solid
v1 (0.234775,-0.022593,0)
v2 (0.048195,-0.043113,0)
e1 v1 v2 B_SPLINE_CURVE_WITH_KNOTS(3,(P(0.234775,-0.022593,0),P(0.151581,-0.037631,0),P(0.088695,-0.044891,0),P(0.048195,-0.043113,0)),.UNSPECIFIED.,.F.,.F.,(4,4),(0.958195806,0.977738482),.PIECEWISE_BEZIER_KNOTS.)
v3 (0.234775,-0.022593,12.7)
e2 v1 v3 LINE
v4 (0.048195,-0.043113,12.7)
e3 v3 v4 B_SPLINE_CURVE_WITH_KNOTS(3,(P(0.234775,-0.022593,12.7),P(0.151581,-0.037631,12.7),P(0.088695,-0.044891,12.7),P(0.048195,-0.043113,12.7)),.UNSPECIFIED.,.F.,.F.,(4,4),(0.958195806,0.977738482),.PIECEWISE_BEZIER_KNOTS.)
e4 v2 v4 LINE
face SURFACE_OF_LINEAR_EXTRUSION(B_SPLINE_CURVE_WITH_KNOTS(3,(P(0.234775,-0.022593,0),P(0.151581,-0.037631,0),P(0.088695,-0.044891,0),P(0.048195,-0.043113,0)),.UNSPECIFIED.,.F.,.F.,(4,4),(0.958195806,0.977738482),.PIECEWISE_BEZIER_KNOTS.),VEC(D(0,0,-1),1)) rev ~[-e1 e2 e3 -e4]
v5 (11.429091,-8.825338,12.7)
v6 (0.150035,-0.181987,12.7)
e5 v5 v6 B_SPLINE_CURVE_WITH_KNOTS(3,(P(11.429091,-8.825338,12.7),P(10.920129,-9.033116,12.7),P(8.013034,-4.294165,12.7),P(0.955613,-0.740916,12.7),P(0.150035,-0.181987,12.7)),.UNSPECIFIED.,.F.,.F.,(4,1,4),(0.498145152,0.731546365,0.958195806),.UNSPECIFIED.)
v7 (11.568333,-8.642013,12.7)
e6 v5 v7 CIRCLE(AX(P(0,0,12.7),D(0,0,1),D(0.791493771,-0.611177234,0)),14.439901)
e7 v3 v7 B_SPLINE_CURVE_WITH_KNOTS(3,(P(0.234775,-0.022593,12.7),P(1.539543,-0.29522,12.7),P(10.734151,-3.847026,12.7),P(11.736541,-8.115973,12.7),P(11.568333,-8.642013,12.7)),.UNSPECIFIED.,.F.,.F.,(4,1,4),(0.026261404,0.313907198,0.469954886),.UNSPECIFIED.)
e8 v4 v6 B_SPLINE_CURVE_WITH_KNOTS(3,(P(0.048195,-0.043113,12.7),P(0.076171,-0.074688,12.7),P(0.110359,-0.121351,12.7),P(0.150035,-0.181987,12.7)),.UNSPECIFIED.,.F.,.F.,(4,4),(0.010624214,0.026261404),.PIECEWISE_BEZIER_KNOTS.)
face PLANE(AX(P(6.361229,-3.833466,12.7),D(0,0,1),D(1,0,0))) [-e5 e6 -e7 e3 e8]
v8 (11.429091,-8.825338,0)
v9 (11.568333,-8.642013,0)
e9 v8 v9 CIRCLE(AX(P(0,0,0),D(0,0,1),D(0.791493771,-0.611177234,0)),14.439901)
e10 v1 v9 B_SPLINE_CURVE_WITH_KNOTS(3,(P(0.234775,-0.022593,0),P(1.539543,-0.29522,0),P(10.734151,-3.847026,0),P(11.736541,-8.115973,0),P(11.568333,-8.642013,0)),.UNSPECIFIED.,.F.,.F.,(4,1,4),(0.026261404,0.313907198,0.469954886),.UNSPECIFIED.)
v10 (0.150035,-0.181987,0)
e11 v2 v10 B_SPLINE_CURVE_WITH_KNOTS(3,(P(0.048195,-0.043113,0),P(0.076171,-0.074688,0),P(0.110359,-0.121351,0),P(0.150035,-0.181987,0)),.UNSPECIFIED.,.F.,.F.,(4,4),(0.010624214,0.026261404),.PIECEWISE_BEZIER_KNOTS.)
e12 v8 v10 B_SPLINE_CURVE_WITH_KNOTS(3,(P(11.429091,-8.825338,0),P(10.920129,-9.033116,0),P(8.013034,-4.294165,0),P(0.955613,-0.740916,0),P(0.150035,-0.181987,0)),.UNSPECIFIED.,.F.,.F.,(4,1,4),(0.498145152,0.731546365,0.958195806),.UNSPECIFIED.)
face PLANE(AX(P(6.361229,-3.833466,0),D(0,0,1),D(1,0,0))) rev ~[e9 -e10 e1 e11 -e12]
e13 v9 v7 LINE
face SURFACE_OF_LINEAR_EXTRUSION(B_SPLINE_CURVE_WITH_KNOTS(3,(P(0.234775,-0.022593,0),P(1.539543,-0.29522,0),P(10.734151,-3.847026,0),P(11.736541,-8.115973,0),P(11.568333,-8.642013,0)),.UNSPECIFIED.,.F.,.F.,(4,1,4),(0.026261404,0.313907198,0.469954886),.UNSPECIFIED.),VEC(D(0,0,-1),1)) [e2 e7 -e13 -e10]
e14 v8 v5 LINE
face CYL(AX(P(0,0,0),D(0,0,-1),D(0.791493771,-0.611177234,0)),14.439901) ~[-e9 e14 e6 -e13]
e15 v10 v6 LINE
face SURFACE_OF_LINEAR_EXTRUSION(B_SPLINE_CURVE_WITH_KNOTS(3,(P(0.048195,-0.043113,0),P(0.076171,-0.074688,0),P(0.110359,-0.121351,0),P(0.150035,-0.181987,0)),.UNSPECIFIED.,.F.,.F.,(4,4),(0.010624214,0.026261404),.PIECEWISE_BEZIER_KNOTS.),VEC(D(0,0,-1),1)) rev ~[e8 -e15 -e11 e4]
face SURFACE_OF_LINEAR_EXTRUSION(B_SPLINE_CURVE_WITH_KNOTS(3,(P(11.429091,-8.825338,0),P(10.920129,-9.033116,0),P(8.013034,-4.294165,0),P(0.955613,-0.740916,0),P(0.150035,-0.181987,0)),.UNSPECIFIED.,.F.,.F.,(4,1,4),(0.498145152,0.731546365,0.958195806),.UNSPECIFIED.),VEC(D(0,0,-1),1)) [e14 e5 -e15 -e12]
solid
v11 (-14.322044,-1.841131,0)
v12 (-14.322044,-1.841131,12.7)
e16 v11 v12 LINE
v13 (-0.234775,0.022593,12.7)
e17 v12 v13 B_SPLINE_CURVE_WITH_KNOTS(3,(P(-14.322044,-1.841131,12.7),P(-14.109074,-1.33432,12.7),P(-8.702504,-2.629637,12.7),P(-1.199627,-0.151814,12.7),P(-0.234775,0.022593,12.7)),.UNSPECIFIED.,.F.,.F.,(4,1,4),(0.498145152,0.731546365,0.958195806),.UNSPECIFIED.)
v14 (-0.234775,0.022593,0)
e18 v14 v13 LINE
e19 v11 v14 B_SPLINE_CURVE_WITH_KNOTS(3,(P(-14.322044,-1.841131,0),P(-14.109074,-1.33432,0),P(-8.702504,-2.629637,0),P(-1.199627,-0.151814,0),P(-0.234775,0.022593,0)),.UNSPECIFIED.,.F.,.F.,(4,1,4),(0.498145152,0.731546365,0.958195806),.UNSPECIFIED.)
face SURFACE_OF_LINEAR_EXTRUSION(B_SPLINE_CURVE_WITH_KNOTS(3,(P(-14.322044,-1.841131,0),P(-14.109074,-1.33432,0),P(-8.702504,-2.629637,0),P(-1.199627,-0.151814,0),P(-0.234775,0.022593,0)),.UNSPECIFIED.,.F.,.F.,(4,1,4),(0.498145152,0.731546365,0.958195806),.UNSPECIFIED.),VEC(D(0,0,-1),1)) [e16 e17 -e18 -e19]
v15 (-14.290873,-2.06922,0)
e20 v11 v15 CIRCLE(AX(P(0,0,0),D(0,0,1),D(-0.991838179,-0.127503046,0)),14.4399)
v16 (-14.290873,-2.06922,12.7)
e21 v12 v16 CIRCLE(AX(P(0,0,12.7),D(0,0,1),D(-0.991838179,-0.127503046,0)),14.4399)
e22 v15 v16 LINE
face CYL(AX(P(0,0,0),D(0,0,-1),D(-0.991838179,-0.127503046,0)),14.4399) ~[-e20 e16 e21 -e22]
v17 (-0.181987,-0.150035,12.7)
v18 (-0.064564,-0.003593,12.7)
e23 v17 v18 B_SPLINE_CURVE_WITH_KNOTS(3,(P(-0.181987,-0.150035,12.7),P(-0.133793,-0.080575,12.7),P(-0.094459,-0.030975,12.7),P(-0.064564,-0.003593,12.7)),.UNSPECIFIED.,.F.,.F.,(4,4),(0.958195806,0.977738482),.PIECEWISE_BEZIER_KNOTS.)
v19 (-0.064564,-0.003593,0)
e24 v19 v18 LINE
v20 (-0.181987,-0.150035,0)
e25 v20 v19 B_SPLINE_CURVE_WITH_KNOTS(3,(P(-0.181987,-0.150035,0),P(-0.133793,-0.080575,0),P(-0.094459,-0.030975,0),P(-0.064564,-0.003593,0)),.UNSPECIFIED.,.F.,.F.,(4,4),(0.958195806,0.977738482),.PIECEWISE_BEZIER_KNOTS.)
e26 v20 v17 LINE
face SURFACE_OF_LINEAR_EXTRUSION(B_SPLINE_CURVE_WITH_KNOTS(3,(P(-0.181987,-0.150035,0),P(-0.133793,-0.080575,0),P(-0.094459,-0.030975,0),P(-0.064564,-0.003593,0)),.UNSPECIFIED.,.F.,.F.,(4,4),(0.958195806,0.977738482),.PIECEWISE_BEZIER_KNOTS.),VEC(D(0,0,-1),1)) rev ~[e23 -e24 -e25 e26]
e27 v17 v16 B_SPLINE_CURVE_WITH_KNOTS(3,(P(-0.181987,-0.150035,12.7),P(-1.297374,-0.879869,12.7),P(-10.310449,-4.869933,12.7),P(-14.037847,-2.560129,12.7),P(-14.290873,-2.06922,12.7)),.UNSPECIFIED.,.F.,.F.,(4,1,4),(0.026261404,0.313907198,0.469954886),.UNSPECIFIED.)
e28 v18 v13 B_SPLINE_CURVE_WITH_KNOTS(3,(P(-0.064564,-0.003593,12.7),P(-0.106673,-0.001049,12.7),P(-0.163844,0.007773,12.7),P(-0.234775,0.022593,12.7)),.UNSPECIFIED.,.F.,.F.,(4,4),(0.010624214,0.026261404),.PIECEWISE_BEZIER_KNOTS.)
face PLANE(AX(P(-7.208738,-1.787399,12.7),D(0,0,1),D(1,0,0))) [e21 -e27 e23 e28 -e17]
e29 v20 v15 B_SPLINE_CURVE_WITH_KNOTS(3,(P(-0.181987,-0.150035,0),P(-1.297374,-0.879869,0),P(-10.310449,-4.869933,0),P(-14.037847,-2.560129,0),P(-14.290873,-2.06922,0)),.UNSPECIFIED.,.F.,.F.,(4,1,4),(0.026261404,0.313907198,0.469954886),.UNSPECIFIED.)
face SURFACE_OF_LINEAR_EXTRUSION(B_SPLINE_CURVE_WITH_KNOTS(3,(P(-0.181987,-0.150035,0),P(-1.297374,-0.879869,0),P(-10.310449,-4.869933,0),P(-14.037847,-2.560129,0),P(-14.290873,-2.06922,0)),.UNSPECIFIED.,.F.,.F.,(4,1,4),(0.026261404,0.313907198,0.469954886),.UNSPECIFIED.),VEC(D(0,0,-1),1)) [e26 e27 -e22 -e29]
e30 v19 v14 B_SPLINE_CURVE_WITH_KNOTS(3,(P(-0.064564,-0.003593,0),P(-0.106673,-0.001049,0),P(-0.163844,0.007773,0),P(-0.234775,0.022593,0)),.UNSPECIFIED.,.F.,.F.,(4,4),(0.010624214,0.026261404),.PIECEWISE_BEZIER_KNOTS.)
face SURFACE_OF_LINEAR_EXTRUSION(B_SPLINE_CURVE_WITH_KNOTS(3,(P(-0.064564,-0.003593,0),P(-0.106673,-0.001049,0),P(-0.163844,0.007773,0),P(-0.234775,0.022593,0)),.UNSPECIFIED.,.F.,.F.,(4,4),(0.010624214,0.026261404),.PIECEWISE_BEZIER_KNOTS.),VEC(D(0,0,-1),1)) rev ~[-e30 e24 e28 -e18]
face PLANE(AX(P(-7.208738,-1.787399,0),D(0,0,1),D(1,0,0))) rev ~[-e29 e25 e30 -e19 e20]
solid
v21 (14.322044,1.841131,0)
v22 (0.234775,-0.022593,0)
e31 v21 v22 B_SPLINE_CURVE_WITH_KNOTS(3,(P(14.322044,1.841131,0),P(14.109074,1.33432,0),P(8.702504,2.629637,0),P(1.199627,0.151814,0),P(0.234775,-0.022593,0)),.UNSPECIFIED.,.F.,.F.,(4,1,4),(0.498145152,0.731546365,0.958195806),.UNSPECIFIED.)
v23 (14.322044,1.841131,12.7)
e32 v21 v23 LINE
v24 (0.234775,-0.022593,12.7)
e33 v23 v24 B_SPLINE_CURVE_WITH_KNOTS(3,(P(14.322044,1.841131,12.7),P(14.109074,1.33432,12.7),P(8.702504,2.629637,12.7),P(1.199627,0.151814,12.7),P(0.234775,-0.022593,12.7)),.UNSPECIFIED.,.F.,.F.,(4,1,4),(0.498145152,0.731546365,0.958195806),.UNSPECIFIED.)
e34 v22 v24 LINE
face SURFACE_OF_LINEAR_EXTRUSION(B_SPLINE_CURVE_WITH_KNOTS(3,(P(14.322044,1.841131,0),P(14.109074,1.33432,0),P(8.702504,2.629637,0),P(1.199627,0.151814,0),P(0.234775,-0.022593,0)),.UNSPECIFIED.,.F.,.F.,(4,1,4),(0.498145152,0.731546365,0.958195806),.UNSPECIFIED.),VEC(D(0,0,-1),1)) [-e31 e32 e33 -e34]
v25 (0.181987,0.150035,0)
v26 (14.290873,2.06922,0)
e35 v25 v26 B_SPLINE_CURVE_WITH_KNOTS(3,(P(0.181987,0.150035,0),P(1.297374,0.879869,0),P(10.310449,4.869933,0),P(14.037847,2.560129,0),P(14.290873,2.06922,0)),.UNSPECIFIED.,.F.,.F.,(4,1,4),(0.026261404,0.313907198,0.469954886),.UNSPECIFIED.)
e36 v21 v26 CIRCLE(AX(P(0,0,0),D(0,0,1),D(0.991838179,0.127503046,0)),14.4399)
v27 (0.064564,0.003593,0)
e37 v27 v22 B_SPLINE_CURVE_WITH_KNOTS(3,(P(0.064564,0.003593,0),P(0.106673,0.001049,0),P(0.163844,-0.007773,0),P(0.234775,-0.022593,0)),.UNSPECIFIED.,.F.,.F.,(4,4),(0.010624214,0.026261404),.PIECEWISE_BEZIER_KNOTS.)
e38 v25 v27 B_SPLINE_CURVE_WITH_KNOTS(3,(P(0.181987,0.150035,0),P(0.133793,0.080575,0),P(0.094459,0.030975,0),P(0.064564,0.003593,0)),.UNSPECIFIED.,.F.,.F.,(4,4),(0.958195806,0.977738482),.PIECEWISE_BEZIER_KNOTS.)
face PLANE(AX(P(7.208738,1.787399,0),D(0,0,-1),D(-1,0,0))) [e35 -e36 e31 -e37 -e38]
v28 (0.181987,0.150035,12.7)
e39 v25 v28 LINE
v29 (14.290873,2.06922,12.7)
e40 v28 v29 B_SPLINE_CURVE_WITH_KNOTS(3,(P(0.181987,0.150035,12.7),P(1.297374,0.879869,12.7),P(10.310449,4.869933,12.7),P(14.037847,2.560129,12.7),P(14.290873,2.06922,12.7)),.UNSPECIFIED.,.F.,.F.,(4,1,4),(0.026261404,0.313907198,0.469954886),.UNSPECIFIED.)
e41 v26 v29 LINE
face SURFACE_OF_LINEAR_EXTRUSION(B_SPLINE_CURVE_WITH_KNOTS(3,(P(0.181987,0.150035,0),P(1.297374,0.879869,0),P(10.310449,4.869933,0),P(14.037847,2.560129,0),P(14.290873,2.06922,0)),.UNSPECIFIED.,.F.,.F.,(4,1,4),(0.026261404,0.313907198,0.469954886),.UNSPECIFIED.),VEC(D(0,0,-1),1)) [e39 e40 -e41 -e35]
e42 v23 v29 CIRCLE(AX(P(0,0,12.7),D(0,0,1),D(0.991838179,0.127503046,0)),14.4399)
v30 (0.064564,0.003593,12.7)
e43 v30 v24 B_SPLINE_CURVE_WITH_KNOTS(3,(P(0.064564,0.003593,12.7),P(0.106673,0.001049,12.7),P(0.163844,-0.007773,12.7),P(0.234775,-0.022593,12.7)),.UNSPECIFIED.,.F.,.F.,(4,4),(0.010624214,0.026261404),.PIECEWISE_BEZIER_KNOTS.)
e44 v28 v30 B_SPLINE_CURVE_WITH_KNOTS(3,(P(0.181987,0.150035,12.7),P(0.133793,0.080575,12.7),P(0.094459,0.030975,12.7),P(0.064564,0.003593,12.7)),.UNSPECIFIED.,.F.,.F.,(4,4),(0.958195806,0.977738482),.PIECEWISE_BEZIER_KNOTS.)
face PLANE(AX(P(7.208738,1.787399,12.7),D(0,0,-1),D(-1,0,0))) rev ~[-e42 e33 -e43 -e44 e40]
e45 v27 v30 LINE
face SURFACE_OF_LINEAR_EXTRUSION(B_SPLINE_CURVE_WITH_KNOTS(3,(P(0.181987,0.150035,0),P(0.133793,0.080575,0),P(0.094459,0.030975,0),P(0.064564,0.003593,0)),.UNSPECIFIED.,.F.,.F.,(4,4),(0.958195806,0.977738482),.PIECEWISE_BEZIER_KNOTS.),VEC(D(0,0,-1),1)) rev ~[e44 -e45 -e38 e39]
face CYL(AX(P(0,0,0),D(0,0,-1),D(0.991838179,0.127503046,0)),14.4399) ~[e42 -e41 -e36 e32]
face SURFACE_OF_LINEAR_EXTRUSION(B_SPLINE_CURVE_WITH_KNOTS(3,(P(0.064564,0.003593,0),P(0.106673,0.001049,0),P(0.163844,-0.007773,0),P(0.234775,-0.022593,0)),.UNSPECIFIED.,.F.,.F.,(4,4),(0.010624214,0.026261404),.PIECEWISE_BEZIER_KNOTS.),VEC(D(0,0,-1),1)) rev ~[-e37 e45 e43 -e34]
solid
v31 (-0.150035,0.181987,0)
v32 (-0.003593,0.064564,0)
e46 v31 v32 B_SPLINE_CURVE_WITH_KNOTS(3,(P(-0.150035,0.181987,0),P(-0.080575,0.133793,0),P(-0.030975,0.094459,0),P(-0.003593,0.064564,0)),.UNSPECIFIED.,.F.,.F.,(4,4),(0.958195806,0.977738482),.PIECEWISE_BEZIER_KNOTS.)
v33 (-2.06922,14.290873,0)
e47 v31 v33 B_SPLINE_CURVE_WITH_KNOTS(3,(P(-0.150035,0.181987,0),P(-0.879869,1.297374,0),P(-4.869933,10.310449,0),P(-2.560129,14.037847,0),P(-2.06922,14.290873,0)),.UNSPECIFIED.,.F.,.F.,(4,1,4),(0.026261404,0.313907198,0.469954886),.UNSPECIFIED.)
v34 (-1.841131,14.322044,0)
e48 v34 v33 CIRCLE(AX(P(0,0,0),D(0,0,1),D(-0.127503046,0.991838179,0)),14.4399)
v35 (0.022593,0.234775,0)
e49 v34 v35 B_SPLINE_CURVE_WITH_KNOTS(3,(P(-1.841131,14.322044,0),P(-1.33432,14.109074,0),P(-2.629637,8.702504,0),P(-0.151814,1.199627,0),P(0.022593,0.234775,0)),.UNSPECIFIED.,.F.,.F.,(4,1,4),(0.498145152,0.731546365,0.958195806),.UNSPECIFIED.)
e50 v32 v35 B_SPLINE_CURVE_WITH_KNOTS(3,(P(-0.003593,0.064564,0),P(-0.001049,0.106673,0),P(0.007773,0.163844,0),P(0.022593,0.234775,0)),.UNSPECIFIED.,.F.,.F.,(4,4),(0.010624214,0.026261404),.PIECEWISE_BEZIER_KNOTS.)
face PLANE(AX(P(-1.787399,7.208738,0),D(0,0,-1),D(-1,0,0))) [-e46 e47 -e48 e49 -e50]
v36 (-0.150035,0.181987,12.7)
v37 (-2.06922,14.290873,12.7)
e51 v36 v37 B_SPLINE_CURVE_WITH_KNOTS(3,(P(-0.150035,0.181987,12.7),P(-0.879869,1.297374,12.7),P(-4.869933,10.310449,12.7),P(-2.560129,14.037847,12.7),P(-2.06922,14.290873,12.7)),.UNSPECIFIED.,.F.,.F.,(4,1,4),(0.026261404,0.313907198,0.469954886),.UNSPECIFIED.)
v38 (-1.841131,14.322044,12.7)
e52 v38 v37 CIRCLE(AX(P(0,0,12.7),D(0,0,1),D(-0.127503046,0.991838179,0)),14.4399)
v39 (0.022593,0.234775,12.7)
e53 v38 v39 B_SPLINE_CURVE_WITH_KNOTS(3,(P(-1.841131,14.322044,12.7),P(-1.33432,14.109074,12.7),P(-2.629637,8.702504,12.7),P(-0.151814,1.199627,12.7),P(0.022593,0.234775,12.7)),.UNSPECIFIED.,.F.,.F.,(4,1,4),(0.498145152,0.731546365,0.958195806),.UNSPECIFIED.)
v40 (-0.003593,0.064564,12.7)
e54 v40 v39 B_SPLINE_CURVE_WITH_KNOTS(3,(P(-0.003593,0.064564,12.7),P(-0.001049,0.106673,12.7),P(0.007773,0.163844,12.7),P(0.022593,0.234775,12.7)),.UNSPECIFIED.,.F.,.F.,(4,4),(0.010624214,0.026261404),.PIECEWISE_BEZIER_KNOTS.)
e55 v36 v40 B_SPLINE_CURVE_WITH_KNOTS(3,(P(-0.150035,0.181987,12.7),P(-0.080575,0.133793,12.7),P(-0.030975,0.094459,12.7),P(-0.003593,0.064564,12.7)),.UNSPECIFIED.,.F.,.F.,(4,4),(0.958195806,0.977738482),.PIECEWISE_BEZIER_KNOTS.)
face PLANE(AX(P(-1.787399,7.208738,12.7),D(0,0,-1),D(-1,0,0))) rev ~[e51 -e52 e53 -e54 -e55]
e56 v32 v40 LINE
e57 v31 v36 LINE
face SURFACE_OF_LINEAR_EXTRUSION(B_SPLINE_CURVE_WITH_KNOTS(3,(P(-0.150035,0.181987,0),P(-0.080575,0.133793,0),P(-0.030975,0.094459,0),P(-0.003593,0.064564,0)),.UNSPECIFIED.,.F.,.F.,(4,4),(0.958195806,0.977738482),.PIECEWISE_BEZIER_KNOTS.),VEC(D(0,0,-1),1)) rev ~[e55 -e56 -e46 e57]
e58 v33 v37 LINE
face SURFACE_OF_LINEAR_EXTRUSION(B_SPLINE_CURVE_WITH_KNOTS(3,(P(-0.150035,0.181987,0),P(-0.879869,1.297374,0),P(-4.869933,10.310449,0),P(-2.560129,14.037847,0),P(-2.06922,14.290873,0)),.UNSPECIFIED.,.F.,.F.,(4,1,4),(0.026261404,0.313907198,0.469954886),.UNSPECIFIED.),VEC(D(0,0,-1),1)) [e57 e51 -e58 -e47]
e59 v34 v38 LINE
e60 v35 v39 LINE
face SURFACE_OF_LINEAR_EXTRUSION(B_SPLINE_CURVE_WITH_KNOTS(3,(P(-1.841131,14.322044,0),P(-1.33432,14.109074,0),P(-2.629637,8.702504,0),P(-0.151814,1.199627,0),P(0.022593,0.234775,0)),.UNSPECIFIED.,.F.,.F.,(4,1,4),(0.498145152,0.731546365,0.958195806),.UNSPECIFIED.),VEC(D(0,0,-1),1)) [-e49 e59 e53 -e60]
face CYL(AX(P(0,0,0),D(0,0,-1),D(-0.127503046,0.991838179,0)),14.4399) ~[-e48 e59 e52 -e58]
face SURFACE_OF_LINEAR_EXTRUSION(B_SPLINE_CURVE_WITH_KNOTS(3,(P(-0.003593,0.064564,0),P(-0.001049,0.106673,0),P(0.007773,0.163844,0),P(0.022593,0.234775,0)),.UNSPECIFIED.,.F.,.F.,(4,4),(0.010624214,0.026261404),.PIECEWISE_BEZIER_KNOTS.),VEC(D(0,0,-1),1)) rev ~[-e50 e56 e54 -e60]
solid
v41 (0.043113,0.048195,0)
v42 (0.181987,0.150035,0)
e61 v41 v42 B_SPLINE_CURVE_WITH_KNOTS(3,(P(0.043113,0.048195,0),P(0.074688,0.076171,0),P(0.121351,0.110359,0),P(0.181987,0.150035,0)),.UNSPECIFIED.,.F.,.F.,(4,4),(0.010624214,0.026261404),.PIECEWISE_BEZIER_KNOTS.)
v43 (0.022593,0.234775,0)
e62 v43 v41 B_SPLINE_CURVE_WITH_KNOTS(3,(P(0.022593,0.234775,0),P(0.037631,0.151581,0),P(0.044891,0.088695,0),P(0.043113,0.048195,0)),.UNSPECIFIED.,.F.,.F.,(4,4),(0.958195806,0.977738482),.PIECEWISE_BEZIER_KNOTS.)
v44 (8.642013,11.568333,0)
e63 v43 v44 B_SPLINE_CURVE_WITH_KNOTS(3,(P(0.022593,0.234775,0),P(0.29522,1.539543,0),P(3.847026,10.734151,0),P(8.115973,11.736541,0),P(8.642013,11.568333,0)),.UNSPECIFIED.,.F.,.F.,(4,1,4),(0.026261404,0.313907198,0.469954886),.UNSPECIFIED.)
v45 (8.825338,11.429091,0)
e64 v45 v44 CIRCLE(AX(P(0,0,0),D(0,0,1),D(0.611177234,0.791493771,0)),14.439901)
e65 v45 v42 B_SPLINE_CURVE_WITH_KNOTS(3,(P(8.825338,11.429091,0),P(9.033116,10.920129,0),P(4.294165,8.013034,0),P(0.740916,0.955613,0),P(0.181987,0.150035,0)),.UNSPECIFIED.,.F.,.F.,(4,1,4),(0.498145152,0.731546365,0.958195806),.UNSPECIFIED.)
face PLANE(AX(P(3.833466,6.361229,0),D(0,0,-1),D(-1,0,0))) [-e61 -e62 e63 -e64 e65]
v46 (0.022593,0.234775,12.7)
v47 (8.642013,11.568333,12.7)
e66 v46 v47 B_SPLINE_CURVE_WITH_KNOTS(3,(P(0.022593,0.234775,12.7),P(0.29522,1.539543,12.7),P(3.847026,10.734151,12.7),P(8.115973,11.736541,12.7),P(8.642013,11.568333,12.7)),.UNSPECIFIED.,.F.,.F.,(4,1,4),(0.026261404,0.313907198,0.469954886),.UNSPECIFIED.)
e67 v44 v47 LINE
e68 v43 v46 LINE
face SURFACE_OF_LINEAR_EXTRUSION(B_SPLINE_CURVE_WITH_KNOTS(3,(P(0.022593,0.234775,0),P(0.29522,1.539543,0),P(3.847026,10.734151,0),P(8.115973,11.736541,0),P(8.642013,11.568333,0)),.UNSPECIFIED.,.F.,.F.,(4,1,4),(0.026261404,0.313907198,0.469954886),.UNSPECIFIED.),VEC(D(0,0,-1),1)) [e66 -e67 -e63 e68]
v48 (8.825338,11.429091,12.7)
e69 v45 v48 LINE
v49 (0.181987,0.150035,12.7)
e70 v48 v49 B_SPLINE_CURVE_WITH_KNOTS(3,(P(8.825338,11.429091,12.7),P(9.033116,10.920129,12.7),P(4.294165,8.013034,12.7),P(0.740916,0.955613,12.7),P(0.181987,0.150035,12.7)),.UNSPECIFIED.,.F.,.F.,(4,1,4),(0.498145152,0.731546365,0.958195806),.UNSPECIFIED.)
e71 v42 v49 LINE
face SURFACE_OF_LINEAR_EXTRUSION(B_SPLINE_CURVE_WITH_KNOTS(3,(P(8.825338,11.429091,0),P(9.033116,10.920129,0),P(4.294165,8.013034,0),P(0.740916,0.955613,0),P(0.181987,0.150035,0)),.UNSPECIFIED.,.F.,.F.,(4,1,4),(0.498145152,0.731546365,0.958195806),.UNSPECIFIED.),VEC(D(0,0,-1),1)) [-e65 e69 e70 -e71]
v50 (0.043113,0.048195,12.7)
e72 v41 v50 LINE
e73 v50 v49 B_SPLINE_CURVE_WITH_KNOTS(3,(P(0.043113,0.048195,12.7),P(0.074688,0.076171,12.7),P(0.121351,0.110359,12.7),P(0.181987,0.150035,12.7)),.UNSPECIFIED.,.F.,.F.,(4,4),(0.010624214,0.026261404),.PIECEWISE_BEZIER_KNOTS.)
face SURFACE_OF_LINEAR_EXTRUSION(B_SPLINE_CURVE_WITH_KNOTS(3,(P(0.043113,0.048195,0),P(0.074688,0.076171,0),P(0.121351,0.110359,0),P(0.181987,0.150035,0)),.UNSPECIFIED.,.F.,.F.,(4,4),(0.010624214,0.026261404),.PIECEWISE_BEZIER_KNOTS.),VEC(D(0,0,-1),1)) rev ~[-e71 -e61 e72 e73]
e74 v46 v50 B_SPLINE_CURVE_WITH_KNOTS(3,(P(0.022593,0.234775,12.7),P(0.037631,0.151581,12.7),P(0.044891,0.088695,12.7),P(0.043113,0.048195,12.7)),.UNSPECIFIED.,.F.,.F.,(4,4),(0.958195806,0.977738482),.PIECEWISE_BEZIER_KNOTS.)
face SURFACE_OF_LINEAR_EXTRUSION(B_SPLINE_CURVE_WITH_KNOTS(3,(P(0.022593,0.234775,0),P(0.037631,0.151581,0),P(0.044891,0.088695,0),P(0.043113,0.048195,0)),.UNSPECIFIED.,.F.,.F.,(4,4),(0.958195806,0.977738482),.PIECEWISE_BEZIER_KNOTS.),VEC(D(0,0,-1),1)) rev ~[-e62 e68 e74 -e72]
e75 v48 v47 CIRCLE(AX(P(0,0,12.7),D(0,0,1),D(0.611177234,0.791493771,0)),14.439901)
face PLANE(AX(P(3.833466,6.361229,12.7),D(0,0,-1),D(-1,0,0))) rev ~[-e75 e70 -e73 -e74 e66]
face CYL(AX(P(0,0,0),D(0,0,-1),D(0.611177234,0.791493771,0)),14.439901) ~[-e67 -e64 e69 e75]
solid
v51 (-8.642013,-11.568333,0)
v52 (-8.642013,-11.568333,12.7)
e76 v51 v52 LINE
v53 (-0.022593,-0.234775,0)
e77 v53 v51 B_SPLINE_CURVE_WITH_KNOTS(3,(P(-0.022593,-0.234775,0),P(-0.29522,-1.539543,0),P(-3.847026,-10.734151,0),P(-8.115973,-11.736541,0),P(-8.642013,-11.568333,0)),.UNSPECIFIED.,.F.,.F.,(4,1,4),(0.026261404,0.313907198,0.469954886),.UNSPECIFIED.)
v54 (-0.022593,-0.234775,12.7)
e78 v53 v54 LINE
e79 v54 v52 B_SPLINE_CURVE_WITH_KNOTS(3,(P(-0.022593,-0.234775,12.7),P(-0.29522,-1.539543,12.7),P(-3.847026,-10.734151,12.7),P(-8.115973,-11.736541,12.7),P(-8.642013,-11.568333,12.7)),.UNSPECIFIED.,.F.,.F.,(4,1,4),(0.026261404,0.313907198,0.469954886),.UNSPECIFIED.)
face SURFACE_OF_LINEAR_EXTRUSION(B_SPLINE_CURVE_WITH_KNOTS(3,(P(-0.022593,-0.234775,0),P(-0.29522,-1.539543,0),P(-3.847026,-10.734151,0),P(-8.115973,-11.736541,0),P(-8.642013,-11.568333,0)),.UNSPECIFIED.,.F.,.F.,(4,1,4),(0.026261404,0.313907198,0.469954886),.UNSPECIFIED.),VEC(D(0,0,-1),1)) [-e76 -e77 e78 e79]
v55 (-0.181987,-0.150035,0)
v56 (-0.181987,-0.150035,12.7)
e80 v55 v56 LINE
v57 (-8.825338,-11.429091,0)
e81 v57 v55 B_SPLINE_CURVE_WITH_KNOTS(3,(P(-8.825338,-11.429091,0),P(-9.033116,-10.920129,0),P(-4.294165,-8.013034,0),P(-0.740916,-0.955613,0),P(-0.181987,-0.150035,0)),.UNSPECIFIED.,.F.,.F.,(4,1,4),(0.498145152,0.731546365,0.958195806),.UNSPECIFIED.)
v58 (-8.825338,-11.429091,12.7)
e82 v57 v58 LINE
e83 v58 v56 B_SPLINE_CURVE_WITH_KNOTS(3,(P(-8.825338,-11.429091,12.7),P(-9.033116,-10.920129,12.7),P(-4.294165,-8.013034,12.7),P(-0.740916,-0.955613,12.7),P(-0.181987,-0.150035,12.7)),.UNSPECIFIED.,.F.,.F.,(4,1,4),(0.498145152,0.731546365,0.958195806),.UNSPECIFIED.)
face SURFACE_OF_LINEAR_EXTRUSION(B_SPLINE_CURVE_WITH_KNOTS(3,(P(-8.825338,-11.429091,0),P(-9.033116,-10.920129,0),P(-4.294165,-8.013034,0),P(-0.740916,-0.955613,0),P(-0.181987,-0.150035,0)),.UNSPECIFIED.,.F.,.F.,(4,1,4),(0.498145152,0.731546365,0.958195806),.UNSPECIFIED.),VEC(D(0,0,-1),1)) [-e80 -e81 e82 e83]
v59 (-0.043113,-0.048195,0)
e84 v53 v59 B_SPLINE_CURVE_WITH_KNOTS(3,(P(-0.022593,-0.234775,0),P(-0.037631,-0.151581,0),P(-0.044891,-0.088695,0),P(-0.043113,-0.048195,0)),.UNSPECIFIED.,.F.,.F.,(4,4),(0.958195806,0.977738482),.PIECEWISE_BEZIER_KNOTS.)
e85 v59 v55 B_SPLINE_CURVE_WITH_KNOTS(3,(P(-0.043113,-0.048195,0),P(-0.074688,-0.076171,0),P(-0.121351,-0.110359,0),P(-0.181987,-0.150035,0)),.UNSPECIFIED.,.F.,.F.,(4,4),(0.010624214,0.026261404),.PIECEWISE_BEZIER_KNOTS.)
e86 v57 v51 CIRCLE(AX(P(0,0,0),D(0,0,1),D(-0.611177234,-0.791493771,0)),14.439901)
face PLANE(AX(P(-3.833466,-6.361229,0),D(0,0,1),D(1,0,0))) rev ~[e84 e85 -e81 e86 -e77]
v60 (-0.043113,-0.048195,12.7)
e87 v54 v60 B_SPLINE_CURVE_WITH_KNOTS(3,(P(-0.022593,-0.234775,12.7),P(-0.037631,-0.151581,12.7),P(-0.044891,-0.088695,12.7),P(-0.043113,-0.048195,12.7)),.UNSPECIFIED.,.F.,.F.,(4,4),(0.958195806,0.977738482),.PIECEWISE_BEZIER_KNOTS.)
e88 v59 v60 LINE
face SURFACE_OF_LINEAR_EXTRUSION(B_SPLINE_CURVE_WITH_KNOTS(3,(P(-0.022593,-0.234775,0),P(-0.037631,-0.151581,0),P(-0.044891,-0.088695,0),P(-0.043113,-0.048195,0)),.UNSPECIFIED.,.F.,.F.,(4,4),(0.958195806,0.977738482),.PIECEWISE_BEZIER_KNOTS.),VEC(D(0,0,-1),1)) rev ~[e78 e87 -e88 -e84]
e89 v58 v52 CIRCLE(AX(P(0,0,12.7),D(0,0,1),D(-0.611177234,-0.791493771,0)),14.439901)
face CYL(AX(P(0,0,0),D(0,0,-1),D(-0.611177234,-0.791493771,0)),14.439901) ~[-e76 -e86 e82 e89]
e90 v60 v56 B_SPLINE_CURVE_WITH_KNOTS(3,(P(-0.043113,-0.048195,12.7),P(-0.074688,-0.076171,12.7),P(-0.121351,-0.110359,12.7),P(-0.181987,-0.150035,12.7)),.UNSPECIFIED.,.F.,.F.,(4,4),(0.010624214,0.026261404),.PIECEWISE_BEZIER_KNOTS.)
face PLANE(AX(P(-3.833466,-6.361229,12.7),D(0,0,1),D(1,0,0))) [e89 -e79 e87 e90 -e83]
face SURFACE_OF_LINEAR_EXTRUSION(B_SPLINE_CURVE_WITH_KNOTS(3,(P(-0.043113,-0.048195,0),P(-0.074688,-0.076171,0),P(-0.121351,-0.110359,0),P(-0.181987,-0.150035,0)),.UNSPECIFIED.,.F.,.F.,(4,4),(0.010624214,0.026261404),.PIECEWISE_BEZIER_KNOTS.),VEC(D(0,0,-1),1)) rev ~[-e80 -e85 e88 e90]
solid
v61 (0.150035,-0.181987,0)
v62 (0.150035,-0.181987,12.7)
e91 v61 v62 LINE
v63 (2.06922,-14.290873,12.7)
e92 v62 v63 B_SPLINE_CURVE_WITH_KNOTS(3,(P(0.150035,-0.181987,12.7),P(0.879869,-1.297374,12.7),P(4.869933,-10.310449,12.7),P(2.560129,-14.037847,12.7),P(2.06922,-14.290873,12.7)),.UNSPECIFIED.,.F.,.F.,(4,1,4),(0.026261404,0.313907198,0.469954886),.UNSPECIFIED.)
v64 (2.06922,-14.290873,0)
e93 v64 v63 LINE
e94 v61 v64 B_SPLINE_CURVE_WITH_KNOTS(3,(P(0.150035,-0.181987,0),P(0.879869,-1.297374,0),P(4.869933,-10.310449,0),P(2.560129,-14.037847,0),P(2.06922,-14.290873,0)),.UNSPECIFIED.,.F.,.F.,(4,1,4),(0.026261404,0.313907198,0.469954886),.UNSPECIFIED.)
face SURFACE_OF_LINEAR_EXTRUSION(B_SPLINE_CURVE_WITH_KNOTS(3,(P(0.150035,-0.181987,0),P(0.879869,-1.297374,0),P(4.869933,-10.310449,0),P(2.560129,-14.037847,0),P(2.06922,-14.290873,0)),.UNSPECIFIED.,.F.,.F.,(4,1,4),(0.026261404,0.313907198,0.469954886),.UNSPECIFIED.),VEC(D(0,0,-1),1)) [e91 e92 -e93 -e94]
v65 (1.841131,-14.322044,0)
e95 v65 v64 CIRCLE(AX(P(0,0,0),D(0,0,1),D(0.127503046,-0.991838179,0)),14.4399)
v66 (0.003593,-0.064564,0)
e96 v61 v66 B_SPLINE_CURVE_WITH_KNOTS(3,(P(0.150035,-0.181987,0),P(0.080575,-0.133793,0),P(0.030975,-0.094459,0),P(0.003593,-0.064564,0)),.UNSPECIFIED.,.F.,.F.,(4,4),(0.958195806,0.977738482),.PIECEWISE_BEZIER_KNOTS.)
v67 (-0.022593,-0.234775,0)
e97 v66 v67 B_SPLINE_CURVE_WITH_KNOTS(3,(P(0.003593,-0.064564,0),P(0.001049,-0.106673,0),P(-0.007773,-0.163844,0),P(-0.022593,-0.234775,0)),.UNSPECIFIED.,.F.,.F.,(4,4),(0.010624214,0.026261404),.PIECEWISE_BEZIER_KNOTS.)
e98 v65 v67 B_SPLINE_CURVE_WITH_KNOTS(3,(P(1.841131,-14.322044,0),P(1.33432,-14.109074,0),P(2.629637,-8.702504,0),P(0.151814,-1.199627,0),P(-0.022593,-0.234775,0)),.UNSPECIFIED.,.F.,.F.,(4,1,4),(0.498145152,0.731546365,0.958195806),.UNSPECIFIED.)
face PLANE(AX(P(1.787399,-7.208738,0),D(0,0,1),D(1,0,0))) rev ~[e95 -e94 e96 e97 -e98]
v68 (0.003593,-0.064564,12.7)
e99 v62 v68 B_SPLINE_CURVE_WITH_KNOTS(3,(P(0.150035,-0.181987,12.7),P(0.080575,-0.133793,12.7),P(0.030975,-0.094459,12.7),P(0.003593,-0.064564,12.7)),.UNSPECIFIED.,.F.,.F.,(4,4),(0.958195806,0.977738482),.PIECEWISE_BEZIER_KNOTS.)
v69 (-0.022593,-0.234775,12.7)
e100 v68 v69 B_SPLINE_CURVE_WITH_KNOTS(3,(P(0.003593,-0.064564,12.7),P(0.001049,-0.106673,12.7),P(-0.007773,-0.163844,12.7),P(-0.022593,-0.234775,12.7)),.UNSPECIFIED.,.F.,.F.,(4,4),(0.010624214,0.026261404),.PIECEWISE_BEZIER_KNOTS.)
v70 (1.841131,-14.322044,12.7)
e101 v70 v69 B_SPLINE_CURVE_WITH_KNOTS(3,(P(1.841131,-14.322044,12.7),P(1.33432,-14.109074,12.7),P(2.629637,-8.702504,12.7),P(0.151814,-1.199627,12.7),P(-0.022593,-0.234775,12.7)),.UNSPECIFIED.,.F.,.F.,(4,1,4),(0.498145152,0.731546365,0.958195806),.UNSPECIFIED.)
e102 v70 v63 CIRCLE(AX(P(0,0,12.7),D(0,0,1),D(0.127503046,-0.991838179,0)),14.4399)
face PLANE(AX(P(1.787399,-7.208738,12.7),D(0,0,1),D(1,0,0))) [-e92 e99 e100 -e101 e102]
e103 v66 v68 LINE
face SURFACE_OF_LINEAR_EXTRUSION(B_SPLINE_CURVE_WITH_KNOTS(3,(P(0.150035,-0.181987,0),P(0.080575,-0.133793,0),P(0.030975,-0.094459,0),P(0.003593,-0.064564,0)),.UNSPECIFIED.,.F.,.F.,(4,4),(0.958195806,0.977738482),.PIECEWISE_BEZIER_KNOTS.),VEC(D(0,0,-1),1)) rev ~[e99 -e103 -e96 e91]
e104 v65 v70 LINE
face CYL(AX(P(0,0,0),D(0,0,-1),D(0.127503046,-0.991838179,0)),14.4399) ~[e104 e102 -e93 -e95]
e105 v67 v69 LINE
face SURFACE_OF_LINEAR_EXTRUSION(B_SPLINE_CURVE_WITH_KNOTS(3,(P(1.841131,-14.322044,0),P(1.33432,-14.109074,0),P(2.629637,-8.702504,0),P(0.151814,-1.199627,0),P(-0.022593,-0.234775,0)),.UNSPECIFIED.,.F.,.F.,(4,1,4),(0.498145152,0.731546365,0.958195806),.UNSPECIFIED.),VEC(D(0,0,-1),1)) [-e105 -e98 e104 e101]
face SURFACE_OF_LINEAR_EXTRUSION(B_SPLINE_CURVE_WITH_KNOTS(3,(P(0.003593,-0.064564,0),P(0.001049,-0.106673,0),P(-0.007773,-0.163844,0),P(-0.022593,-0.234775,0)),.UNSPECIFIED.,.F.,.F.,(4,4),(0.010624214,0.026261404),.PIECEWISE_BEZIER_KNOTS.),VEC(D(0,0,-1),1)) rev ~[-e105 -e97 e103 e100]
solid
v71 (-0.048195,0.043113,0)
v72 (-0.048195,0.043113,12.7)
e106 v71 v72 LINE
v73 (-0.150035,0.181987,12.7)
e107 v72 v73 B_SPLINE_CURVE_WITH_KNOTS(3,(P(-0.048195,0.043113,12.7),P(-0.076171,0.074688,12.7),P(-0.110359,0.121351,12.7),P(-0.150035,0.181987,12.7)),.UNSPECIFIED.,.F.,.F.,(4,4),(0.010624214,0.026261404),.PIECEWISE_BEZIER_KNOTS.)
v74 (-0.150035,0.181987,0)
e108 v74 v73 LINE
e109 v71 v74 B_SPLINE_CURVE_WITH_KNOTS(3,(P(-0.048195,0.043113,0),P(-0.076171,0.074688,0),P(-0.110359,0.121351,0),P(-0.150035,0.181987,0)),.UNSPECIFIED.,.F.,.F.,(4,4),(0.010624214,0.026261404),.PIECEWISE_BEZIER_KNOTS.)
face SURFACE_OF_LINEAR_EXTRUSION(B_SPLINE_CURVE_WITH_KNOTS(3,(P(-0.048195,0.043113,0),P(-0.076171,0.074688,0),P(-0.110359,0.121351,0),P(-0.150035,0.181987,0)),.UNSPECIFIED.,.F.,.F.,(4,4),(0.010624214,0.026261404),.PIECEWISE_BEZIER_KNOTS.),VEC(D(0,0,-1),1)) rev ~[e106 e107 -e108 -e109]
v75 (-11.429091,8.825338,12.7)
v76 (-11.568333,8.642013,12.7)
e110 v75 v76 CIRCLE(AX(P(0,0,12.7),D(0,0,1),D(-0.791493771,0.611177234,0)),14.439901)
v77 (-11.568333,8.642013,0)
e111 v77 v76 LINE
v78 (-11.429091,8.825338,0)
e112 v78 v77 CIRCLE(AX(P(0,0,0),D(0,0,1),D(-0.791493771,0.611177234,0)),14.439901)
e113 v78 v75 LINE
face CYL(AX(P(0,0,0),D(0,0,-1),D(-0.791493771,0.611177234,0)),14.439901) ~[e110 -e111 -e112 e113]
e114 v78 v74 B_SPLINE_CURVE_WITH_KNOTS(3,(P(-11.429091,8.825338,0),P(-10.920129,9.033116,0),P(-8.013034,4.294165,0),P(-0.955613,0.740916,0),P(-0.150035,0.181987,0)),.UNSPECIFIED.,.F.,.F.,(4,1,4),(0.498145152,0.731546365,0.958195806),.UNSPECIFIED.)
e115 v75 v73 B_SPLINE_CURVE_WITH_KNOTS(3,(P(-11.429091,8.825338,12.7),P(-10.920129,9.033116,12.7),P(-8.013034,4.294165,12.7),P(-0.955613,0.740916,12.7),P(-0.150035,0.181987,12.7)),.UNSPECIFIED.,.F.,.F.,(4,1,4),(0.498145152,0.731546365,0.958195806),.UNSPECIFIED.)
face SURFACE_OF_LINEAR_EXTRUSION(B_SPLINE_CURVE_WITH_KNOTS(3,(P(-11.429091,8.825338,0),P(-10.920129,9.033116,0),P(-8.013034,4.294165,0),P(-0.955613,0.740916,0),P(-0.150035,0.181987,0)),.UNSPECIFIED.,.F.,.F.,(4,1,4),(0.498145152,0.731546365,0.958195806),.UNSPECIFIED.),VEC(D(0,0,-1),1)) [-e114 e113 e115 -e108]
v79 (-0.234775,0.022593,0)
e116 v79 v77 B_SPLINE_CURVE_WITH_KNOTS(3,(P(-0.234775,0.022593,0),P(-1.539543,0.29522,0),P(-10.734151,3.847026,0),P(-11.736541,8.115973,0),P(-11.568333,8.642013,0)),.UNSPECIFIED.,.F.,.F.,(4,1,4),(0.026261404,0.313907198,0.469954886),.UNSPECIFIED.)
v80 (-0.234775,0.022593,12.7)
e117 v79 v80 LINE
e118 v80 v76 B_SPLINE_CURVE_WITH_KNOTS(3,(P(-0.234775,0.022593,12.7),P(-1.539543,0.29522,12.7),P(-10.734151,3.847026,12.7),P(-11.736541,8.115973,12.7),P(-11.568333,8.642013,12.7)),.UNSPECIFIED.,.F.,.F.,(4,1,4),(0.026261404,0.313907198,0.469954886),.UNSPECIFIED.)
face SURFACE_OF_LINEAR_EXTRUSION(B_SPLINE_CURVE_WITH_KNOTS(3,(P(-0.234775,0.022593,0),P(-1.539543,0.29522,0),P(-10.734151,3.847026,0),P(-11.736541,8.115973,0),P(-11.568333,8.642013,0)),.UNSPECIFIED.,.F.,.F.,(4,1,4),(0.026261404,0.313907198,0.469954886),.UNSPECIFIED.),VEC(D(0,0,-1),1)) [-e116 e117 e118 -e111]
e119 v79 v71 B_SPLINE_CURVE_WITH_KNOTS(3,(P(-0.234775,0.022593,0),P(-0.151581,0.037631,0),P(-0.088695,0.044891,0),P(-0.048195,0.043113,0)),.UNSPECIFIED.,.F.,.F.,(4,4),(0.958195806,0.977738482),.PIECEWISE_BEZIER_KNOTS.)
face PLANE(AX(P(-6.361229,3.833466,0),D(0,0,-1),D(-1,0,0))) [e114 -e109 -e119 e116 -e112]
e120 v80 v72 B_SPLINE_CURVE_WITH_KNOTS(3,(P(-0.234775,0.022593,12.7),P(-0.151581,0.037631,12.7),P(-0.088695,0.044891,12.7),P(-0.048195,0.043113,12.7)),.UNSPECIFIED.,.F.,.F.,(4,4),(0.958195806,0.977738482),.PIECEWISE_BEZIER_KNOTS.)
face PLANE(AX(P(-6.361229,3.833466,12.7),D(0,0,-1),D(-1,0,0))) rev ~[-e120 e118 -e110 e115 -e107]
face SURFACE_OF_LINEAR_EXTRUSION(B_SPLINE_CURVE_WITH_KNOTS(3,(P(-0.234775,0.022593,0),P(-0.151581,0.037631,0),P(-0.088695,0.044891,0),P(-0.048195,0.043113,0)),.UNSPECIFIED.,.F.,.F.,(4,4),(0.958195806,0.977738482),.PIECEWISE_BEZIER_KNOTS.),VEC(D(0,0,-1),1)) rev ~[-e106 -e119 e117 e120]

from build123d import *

# Parameters (mm, degrees)
F1_DEPTH = 12.7


with BuildPart() as f1:
    # F0 (on Top) → F1 (new body)
    with BuildSketch(Plane.XY):
        with BuildLine():
            add(Edge.make_bspline(
                [(14.3220441214, 1.8411312267), (14.1090744497, 1.3343197104), (8.7025037056, 2.6296370998), (1.1996267139, 0.1518138278), (0.2347746578, -0.0225932885)],
                knots=[0.4981451518, 0.4981451518, 0.4981451518, 0.4981451518, 0.7315463646, 0.9581958063, 0.9581958063, 0.9581958063, 0.9581958063], degree=3))
            ThreePointArc((14.3220441214, 1.8411312267), (14.3069129075, 1.9552378542), (14.2908725977, 2.0692202411))
            add(Edge.make_bspline(
                [(0.1819866201, 0.1500348851), (1.2973737053, 0.8798693546), (10.3104492256, 4.8699327901), (14.037847331, 2.5601286844), (14.2908725977, 2.0692202411)],
                knots=[0.0262614039, 0.0262614039, 0.0262614039, 0.0262614039, 0.313907198, 0.4699548858, 0.4699548858, 0.4699548858, 0.4699548858], degree=3))
            add(Edge.make_bspline(
                [(0.1819866201, 0.1500348851), (0.1337933952, 0.0805745461), (0.0944594245, 0.0309746372), (0.0645641054, 0.0035933646)],
                knots=[0.9581958063, 0.9581958063, 0.9581958063, 0.9581958063, 0.9777384816, 0.9777384816, 0.9777384816, 0.9777384816], degree=3))
            add(Edge.make_bspline(
                [(0.0645641054, 0.0035933646), (0.1066733788, 0.0010488883), (0.1638439629, -0.0077725669), (0.2347746578, -0.0225932885)],
                knots=[0.0106242136, 0.0106242136, 0.0106242136, 0.0106242136, 0.0262614039, 0.0262614039, 0.0262614039, 0.0262614039], degree=3))
        make_face()
    extrude(amount=F1_DEPTH)


with BuildPart() as f1b:
    # F0 (on Top) → F1, piece 2 (new body)
    with BuildSketch(Plane.XY):
        with BuildLine():
            ThreePointArc((11.4290908942, -8.8253381433), (11.4990770803, -8.7339531892), (11.5683325871, -8.6420132587))
            add(Edge.make_bspline(
                [(0.2347746578, -0.0225932885), (1.539543332, -0.2952201575), (10.7341510643, -3.8470260647), (11.7365413944, -8.1159726876), (11.5683325871, -8.6420132587)],
                knots=[0.0262614039, 0.0262614039, 0.0262614039, 0.0262614039, 0.313907198, 0.4699548858, 0.4699548858, 0.4699548858, 0.4699548858], degree=3))
            add(Edge.make_bspline(
                [(0.2347746578, -0.0225932885), (0.1515810249, -0.0376314091), (0.0886952756, -0.0448905236), (0.0481946092, -0.0431128243)],
                knots=[0.9581958063, 0.9581958063, 0.9581958063, 0.9581958063, 0.9777384816, 0.9777384816, 0.9777384816, 0.9777384816], degree=3))
            add(Edge.make_bspline(
                [(0.0481946092, -0.0431128243), (0.0761711456, -0.0746877935), (0.1103591424, -0.121351212), (0.1500348851, -0.1819866201)],
                knots=[0.0106242136, 0.0106242136, 0.0106242136, 0.0106242136, 0.0262614039, 0.0262614039, 0.0262614039, 0.0262614039], degree=3))
            add(Edge.make_bspline(
                [(11.4290908942, -8.8253381433), (10.9201287351, -9.0331157042), (8.0130336089, -4.2941651582), (0.9556127714, -0.7409155972), (0.1500348851, -0.1819866201)],
                knots=[0.4981451518, 0.4981451518, 0.4981451518, 0.4981451518, 0.7315463646, 0.9581958063, 0.9581958063, 0.9581958063, 0.9581958063], degree=3))
        make_face()
    extrude(amount=F1_DEPTH)


with BuildPart() as f1c:
    # F0 (on Top) → F1, piece 3 (new body)
    with BuildSketch(Plane.XY):
        with BuildLine():
            add(Edge.make_bspline(
                [(8.8253381433, 11.4290908942), (9.0331157042, 10.9201287351), (4.2941651582, 8.0130336089), (0.7409155972, 0.9556127714), (0.1819866201, 0.1500348851)],
                knots=[0.4981451518, 0.4981451518, 0.4981451518, 0.4981451518, 0.7315463646, 0.9581958063, 0.9581958063, 0.9581958063, 0.9581958063], degree=3))
            ThreePointArc((8.8253381433, 11.4290908942), (8.7339531892, 11.4990770803), (8.6420132587, 11.5683325871))
            add(Edge.make_bspline(
                [(0.0225932885, 0.2347746578), (0.2952201575, 1.539543332), (3.8470260647, 10.7341510643), (8.1159726876, 11.7365413944), (8.6420132587, 11.5683325871)],
                knots=[0.0262614039, 0.0262614039, 0.0262614039, 0.0262614039, 0.313907198, 0.4699548858, 0.4699548858, 0.4699548858, 0.4699548858], degree=3))
            add(Edge.make_bspline(
                [(0.0225932885, 0.2347746578), (0.0376314091, 0.1515810249), (0.0448905236, 0.0886952756), (0.0431128243, 0.0481946092)],
                knots=[0.9581958063, 0.9581958063, 0.9581958063, 0.9581958063, 0.9777384816, 0.9777384816, 0.9777384816, 0.9777384816], degree=3))
            add(Edge.make_bspline(
                [(0.0431128243, 0.0481946092), (0.0746877935, 0.0761711456), (0.121351212, 0.1103591424), (0.1819866201, 0.1500348851)],
                knots=[0.0106242136, 0.0106242136, 0.0106242136, 0.0106242136, 0.0262614039, 0.0262614039, 0.0262614039, 0.0262614039], degree=3))
        make_face()
    extrude(amount=F1_DEPTH)


with BuildPart() as f1d:
    # F0 (on Top) → F1, piece 4 (new body)
    with BuildSketch(Plane.XY):
        with BuildLine():
            ThreePointArc((1.8411312267, -14.3220441214), (1.9552378542, -14.3069129075), (2.0692202411, -14.2908725977))
            add(Edge.make_bspline(
                [(0.1500348851, -0.1819866201), (0.8798693546, -1.2973737053), (4.8699327901, -10.3104492256), (2.5601286844, -14.037847331), (2.0692202411, -14.2908725977)],
                knots=[0.0262614039, 0.0262614039, 0.0262614039, 0.0262614039, 0.313907198, 0.4699548858, 0.4699548858, 0.4699548858, 0.4699548858], degree=3))
            add(Edge.make_bspline(
                [(0.1500348851, -0.1819866201), (0.0805745461, -0.1337933952), (0.0309746372, -0.0944594245), (0.0035933646, -0.0645641054)],
                knots=[0.9581958063, 0.9581958063, 0.9581958063, 0.9581958063, 0.9777384816, 0.9777384816, 0.9777384816, 0.9777384816], degree=3))
            add(Edge.make_bspline(
                [(0.0035933646, -0.0645641054), (0.0010488883, -0.1066733788), (-0.0077725669, -0.1638439629), (-0.0225932885, -0.2347746578)],
                knots=[0.0106242136, 0.0106242136, 0.0106242136, 0.0106242136, 0.0262614039, 0.0262614039, 0.0262614039, 0.0262614039], degree=3))
            add(Edge.make_bspline(
                [(1.8411312267, -14.3220441214), (1.3343197104, -14.1090744497), (2.6296370998, -8.7025037056), (0.1518138278, -1.1996267139), (-0.0225932885, -0.2347746578)],
                knots=[0.4981451518, 0.4981451518, 0.4981451518, 0.4981451518, 0.7315463646, 0.9581958063, 0.9581958063, 0.9581958063, 0.9581958063], degree=3))
        make_face()
    extrude(amount=F1_DEPTH)


with BuildPart() as f1e:
    # F0 (on Top) → F1, piece 5 (new body)
    with BuildSketch(Plane.XY):
        with BuildLine():
            add(Edge.make_bspline(
                [(-1.8411312267, 14.3220441214), (-1.3343197104, 14.1090744497), (-2.6296370998, 8.7025037056), (-0.1518138278, 1.1996267139), (0.0225932885, 0.2347746578)],
                knots=[0.4981451518, 0.4981451518, 0.4981451518, 0.4981451518, 0.7315463646, 0.9581958063, 0.9581958063, 0.9581958063, 0.9581958063], degree=3))
            ThreePointArc((-1.8411312267, 14.3220441214), (-1.9552378542, 14.3069129075), (-2.0692202411, 14.2908725977))
            add(Edge.make_bspline(
                [(-0.1500348851, 0.1819866201), (-0.8798693546, 1.2973737053), (-4.8699327901, 10.3104492256), (-2.5601286844, 14.037847331), (-2.0692202411, 14.2908725977)],
                knots=[0.0262614039, 0.0262614039, 0.0262614039, 0.0262614039, 0.313907198, 0.4699548858, 0.4699548858, 0.4699548858, 0.4699548858], degree=3))
            add(Edge.make_bspline(
                [(-0.1500348851, 0.1819866201), (-0.0805745461, 0.1337933952), (-0.0309746372, 0.0944594245), (-0.0035933646, 0.0645641054)],
                knots=[0.9581958063, 0.9581958063, 0.9581958063, 0.9581958063, 0.9777384816, 0.9777384816, 0.9777384816, 0.9777384816], degree=3))
            add(Edge.make_bspline(
                [(-0.0035933646, 0.0645641054), (-0.0010488883, 0.1066733788), (0.0077725669, 0.1638439629), (0.0225932885, 0.2347746578)],
                knots=[0.0106242136, 0.0106242136, 0.0106242136, 0.0106242136, 0.0262614039, 0.0262614039, 0.0262614039, 0.0262614039], degree=3))
        make_face()
    extrude(amount=F1_DEPTH)


with BuildPart() as f1f:
    # F0 (on Top) → F1, piece 6 (new body)
    with BuildSketch(Plane.XY):
        with BuildLine():
            ThreePointArc((-8.8253381433, -11.4290908942), (-8.7339531892, -11.4990770803), (-8.6420132587, -11.5683325871))
            add(Edge.make_bspline(
                [(-0.0225932885, -0.2347746578), (-0.2952201575, -1.539543332), (-3.8470260647, -10.7341510643), (-8.1159726876, -11.7365413944), (-8.6420132587, -11.5683325871)],
                knots=[0.0262614039, 0.0262614039, 0.0262614039, 0.0262614039, 0.313907198, 0.4699548858, 0.4699548858, 0.4699548858, 0.4699548858], degree=3))
            add(Edge.make_bspline(
                [(-0.0225932885, -0.2347746578), (-0.0376314091, -0.1515810249), (-0.0448905236, -0.0886952756), (-0.0431128243, -0.0481946092)],
                knots=[0.9581958063, 0.9581958063, 0.9581958063, 0.9581958063, 0.9777384816, 0.9777384816, 0.9777384816, 0.9777384816], degree=3))
            add(Edge.make_bspline(
                [(-0.0431128243, -0.0481946092), (-0.0746877935, -0.0761711456), (-0.121351212, -0.1103591424), (-0.1819866201, -0.1500348851)],
                knots=[0.0106242136, 0.0106242136, 0.0106242136, 0.0106242136, 0.0262614039, 0.0262614039, 0.0262614039, 0.0262614039], degree=3))
            add(Edge.make_bspline(
                [(-8.8253381433, -11.4290908942), (-9.0331157042, -10.9201287351), (-4.2941651582, -8.0130336089), (-0.7409155972, -0.9556127714), (-0.1819866201, -0.1500348851)],
                knots=[0.4981451518, 0.4981451518, 0.4981451518, 0.4981451518, 0.7315463646, 0.9581958063, 0.9581958063, 0.9581958063, 0.9581958063], degree=3))
        make_face()
    extrude(amount=F1_DEPTH)


with BuildPart() as f1g:
    # F0 (on Top) → F1, piece 7 (new body)
    with BuildSketch(Plane.XY):
        with BuildLine():
            add(Edge.make_bspline(
                [(-11.4290908942, 8.8253381433), (-10.9201287351, 9.0331157042), (-8.0130336089, 4.2941651582), (-0.9556127714, 0.7409155972), (-0.1500348851, 0.1819866201)],
                knots=[0.4981451518, 0.4981451518, 0.4981451518, 0.4981451518, 0.7315463646, 0.9581958063, 0.9581958063, 0.9581958063, 0.9581958063], degree=3))
            ThreePointArc((-11.4290908942, 8.8253381433), (-11.4990770803, 8.7339531892), (-11.5683325871, 8.6420132587))
            add(Edge.make_bspline(
                [(-0.2347746578, 0.0225932885), (-1.539543332, 0.2952201575), (-10.7341510643, 3.8470260647), (-11.7365413944, 8.1159726876), (-11.5683325871, 8.6420132587)],
                knots=[0.0262614039, 0.0262614039, 0.0262614039, 0.0262614039, 0.313907198, 0.4699548858, 0.4699548858, 0.4699548858, 0.4699548858], degree=3))
            add(Edge.make_bspline(
                [(-0.2347746578, 0.0225932885), (-0.1515810249, 0.0376314091), (-0.0886952756, 0.0448905236), (-0.0481946092, 0.0431128243)],
                knots=[0.9581958063, 0.9581958063, 0.9581958063, 0.9581958063, 0.9777384816, 0.9777384816, 0.9777384816, 0.9777384816], degree=3))
            add(Edge.make_bspline(
                [(-0.0481946092, 0.0431128243), (-0.0761711456, 0.0746877935), (-0.1103591424, 0.121351212), (-0.1500348851, 0.1819866201)],
                knots=[0.0106242136, 0.0106242136, 0.0106242136, 0.0106242136, 0.0262614039, 0.0262614039, 0.0262614039, 0.0262614039], degree=3))
        make_face()
    extrude(amount=F1_DEPTH)


with BuildPart() as f1h:
    # F0 (on Top) → F1, piece 8 (new body)
    with BuildSketch(Plane.XY):
        with BuildLine():
            add(Edge.make_bspline(
                [(-0.1819866201, -0.1500348851), (-0.1337933952, -0.0805745461), (-0.0944594245, -0.0309746372), (-0.0645641054, -0.0035933646)],
                knots=[0.9581958063, 0.9581958063, 0.9581958063, 0.9581958063, 0.9777384816, 0.9777384816, 0.9777384816, 0.9777384816], degree=3))
            add(Edge.make_bspline(
                [(-0.0645641054, -0.0035933646), (-0.1066733788, -0.0010488883), (-0.1638439629, 0.0077725669), (-0.2347746578, 0.0225932885)],
                knots=[0.0106242136, 0.0106242136, 0.0106242136, 0.0106242136, 0.0262614039, 0.0262614039, 0.0262614039, 0.0262614039], degree=3))
            add(Edge.make_bspline(
                [(-14.3220441214, -1.8411312267), (-14.1090744497, -1.3343197104), (-8.7025037056, -2.6296370998), (-1.1996267139, -0.1518138278), (-0.2347746578, 0.0225932885)],
                knots=[0.4981451518, 0.4981451518, 0.4981451518, 0.4981451518, 0.7315463646, 0.9581958063, 0.9581958063, 0.9581958063, 0.9581958063], degree=3))
            ThreePointArc((-14.3220441214, -1.8411312267), (-14.3069129075, -1.9552378542), (-14.2908725977, -2.0692202411))
            add(Edge.make_bspline(
                [(-0.1819866201, -0.1500348851), (-1.2973737053, -0.8798693546), (-10.3104492256, -4.8699327901), (-14.037847331, -2.5601286844), (-14.2908725977, -2.0692202411)],
                knots=[0.0262614039, 0.0262614039, 0.0262614039, 0.0262614039, 0.313907198, 0.4699548858, 0.4699548858, 0.4699548858, 0.4699548858], degree=3))
        make_face()
    extrude(amount=F1_DEPTH)


solid = Compound([f1.part, f1b.part, f1c.part, f1d.part, f1e.part, f1f.part, f1g.part, f1h.part])
